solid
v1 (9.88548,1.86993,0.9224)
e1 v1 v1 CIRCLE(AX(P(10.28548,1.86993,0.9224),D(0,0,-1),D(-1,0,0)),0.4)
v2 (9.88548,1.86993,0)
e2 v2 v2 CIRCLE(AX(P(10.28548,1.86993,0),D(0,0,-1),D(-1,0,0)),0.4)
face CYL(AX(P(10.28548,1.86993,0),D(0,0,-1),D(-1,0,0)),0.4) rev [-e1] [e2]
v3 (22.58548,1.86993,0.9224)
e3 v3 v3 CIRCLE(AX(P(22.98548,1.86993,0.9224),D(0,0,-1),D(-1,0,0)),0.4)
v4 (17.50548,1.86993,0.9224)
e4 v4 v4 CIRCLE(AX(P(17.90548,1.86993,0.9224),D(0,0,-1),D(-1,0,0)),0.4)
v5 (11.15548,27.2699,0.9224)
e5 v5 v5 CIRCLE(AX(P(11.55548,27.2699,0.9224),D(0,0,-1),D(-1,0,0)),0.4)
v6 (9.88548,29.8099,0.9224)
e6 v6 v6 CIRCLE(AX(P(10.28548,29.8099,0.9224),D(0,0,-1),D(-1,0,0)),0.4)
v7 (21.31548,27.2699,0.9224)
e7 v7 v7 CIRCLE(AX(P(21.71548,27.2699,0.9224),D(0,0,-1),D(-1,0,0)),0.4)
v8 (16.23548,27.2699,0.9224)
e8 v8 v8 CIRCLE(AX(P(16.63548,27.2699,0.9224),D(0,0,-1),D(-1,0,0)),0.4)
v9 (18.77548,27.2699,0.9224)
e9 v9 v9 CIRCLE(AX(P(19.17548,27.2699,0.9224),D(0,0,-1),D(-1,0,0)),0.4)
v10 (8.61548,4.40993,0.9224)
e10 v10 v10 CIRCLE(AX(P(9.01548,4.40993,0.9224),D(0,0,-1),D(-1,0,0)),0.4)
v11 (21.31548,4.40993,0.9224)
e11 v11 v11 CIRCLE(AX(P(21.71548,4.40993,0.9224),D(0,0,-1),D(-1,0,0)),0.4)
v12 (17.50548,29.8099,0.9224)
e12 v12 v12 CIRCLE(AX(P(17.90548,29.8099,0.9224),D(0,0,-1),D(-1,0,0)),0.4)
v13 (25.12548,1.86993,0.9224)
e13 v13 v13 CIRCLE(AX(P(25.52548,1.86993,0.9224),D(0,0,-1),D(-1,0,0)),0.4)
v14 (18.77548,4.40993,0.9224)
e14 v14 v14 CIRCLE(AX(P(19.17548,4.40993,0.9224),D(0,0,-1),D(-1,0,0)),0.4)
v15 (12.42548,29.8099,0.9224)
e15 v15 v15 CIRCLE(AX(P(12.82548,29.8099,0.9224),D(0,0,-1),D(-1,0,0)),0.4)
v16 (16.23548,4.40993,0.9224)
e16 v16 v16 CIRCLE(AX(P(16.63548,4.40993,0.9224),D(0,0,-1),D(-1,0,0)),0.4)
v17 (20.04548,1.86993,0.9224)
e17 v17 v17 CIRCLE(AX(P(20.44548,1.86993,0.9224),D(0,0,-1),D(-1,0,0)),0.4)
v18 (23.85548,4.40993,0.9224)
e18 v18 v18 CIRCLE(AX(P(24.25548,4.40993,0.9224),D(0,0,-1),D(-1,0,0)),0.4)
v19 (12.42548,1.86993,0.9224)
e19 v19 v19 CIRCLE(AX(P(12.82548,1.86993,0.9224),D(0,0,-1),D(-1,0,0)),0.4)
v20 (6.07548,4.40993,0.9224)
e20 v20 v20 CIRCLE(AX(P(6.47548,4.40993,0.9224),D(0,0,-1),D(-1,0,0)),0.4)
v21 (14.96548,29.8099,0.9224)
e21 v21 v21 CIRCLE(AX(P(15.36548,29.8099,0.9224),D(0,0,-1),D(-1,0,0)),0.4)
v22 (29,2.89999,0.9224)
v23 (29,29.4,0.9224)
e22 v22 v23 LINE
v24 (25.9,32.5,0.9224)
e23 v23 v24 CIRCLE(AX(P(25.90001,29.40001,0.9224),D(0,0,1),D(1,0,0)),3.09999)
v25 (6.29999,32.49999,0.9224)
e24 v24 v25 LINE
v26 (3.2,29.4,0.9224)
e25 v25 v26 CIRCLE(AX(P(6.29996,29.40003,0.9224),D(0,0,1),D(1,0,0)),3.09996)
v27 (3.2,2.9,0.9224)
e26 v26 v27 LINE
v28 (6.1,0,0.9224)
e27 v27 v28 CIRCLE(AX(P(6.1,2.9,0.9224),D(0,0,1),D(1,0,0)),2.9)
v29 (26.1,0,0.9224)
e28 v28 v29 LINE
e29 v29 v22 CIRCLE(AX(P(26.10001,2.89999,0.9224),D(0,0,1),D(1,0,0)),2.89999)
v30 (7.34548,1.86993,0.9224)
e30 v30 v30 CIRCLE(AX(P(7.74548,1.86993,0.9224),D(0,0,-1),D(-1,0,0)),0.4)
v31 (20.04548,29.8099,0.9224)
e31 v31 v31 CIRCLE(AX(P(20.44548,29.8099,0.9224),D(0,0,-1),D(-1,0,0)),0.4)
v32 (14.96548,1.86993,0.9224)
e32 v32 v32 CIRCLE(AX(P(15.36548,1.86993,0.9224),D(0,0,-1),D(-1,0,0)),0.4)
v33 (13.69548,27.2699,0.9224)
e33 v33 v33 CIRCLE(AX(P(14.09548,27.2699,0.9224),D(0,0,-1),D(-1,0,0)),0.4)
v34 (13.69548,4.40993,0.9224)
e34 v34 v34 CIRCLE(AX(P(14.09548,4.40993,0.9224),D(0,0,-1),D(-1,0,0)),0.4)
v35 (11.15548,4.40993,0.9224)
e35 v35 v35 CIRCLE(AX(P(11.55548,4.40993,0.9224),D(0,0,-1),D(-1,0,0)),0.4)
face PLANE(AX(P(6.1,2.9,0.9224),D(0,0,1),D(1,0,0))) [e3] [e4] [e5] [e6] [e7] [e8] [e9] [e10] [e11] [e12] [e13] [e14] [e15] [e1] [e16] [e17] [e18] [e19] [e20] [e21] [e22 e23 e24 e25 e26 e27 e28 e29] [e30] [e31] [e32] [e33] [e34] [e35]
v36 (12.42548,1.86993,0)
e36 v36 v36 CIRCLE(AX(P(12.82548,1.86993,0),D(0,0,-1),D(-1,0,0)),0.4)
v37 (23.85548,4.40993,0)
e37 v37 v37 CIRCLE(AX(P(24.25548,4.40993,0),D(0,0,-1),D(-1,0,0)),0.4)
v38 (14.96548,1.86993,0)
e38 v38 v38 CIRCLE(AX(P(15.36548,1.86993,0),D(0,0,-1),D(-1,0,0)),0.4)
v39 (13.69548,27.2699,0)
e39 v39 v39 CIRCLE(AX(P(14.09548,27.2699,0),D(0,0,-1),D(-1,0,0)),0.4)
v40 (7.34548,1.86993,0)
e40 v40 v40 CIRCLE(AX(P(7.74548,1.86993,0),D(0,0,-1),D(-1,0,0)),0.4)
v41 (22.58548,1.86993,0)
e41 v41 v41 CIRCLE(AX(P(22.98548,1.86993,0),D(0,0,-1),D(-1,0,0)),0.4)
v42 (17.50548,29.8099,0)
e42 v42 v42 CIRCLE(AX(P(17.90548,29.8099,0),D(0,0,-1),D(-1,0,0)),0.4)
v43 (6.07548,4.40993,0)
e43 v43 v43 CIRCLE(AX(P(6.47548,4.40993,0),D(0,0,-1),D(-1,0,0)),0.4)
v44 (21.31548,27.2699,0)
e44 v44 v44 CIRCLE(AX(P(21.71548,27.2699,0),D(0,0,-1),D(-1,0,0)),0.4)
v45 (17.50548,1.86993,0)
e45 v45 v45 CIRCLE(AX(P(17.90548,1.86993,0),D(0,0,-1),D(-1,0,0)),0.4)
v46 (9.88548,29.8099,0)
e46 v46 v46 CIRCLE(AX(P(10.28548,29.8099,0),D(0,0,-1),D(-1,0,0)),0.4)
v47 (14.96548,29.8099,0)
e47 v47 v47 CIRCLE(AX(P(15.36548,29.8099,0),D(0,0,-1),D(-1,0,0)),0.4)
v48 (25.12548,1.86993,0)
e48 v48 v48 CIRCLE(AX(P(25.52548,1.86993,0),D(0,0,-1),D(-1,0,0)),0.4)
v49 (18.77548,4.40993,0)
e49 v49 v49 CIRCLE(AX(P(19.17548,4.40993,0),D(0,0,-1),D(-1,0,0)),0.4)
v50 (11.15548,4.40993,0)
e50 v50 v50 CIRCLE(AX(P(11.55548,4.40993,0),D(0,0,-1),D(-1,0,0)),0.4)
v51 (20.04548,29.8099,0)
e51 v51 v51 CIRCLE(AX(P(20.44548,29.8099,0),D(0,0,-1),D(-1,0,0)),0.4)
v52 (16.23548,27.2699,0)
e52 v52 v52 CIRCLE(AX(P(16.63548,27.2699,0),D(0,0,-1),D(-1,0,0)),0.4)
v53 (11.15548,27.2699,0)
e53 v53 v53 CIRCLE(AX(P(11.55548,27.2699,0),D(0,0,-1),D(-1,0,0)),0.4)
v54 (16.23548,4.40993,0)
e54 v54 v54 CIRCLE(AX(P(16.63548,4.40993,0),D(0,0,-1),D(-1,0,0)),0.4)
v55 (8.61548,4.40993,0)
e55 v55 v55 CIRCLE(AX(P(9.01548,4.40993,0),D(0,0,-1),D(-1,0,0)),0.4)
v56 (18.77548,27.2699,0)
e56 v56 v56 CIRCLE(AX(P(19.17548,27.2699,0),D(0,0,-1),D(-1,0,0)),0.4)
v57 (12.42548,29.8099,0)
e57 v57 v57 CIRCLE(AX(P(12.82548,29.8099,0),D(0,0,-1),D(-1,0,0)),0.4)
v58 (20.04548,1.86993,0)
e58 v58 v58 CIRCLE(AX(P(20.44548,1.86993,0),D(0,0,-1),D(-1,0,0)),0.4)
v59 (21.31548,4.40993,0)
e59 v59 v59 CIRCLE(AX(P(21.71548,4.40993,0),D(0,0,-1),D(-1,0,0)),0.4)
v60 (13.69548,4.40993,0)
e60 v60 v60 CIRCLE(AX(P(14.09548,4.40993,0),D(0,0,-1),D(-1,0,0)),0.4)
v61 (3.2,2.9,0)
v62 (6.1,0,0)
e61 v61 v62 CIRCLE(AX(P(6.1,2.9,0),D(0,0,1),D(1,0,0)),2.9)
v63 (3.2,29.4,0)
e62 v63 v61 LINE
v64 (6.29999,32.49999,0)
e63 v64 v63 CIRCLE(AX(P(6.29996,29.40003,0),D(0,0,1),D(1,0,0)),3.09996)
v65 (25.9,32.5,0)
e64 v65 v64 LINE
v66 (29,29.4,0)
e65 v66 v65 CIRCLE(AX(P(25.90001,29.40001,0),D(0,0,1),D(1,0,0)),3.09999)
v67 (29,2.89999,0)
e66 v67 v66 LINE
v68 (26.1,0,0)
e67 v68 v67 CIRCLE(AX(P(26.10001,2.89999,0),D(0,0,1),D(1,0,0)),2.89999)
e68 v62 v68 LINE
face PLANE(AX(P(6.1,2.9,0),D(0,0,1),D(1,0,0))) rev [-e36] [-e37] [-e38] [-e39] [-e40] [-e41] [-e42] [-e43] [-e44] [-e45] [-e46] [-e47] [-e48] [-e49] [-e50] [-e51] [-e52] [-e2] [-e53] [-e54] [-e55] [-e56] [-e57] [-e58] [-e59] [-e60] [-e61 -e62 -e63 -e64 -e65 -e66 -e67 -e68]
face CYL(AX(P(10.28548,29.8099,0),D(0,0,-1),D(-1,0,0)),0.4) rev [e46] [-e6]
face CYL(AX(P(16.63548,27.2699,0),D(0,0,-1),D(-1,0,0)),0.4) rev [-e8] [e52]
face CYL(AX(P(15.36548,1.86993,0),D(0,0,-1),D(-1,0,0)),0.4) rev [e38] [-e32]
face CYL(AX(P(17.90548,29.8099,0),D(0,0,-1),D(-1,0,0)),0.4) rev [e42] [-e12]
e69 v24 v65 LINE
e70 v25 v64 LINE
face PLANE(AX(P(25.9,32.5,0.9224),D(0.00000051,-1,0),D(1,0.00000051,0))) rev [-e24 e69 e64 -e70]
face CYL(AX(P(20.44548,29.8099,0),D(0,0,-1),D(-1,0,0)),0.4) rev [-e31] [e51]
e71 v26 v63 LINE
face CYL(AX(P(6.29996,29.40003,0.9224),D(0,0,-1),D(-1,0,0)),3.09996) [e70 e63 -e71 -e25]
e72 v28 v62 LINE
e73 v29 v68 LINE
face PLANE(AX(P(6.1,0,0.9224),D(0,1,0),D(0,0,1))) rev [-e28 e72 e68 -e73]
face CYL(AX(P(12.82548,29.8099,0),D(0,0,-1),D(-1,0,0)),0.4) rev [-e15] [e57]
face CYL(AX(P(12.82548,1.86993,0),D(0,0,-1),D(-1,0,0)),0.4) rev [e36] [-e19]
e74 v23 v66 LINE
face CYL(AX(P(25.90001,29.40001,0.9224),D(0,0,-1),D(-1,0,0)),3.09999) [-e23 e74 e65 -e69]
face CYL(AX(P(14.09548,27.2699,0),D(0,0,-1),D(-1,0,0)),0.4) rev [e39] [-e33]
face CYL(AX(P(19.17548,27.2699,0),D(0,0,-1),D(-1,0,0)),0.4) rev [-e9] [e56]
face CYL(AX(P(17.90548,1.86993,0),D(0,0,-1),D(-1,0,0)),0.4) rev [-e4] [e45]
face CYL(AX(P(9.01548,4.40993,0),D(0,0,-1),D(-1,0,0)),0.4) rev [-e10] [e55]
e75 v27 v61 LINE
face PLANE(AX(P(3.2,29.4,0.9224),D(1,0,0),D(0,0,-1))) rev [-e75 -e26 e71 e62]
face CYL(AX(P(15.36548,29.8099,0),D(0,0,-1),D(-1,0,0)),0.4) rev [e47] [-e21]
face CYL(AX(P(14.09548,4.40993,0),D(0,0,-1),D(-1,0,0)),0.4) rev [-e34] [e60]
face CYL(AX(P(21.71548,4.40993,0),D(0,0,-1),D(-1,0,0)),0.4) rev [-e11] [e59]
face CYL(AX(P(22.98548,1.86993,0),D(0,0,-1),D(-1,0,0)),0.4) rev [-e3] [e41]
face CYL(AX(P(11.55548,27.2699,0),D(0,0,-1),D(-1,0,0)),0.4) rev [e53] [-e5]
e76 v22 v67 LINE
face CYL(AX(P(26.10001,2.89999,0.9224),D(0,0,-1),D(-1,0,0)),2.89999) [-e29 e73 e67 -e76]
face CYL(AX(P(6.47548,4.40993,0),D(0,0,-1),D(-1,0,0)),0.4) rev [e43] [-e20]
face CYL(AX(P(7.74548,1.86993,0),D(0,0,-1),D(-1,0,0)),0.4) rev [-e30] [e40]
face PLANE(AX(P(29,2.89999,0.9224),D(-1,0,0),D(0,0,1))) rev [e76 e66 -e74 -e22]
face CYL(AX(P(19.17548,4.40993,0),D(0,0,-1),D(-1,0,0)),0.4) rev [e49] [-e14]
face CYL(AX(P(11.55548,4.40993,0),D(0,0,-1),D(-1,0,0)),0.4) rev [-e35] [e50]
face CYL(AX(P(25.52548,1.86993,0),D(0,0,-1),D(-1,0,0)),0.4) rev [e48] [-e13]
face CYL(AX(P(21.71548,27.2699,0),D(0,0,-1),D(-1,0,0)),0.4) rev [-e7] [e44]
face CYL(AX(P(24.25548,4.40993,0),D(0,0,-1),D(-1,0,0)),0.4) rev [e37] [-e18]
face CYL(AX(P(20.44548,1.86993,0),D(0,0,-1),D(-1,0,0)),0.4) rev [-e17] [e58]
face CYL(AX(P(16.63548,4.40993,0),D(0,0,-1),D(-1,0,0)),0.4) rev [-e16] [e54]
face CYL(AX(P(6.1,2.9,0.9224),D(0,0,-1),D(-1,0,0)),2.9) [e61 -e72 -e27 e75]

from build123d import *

# Parameters (mm, degrees)
BOARD_DEPTH                        = 0.9224
F_1_0_228_DIAMETER_HOLE1_OUTLINE_R = 0.4
F_1_0_228_DIAMETER_HOLE1_DEPTH     = 0.9224


# Read off the part's stored shape, not the designer's step: #1 (0.228) Diameter Hole1
with BuildPart() as part:
    # Sketch1 → Board (new body)
    with BuildSketch(Plane.XY):
        with BuildLine():
            Line((6.1, 0), (26.1, 0))
            ThreePointArc((26.1, 0), (28.150609059, 0.84938387), (29, 2.89999))
            Line((29, 2.89999), (29, 29.4))
            ThreePointArc((29, 29.4), (28.092033951, 31.592033951), (25.9, 32.5))
            Line((25.9, 32.5), (6.29999, 32.49999))
            ThreePointArc((6.29999, 32.49999), (4.107957262, 31.592032738), (3.2, 29.4))
            Line((3.2, 29.4), (3.2, 2.9))
            ThreePointArc((3.2, 2.9), (4.049390335, 0.849390335), (6.1, 0))
        make_face()
    extrude(amount=BOARD_DEPTH)

    # #1 (0.228) Diameter Hole1 outline → #1 (0.228) Diameter Hole1 (cut)
    with BuildSketch(Plane.XY):
        with Locations((10.28548, 1.86993)):
            Circle(F_1_0_228_DIAMETER_HOLE1_OUTLINE_R)
        with Locations((9.01548, 4.40993)):
            Circle(F_1_0_228_DIAMETER_HOLE1_OUTLINE_R)
        with Locations((6.47548, 4.40993)):
            Circle(F_1_0_228_DIAMETER_HOLE1_OUTLINE_R)
        with Locations((7.74548, 1.86993)):
            Circle(F_1_0_228_DIAMETER_HOLE1_OUTLINE_R)
        with Locations((11.55548, 4.40993)):
            Circle(F_1_0_228_DIAMETER_HOLE1_OUTLINE_R)
        with Locations((12.82548, 1.86993)):
            Circle(F_1_0_228_DIAMETER_HOLE1_OUTLINE_R)
        with Locations((14.09548, 4.40993)):
            Circle(F_1_0_228_DIAMETER_HOLE1_OUTLINE_R)
        with Locations((24.25548, 4.40993)):
            Circle(F_1_0_228_DIAMETER_HOLE1_OUTLINE_R)
        with Locations((20.44548, 1.86993)):
            Circle(F_1_0_228_DIAMETER_HOLE1_OUTLINE_R)
        with Locations((22.98548, 1.86993)):
            Circle(F_1_0_228_DIAMETER_HOLE1_OUTLINE_R)
        with Locations((16.63548, 4.40993)):
            Circle(F_1_0_228_DIAMETER_HOLE1_OUTLINE_R)
        with Locations((19.17548, 4.40993)):
            Circle(F_1_0_228_DIAMETER_HOLE1_OUTLINE_R)
        with Locations((15.36548, 1.86993)):
            Circle(F_1_0_228_DIAMETER_HOLE1_OUTLINE_R)
        with Locations((17.90548, 1.86993)):
            Circle(F_1_0_228_DIAMETER_HOLE1_OUTLINE_R)
        with Locations((21.71548, 4.40993)):
            Circle(F_1_0_228_DIAMETER_HOLE1_OUTLINE_R)
        with Locations((25.52548, 1.86993)):
            Circle(F_1_0_228_DIAMETER_HOLE1_OUTLINE_R)
        with Locations((10.28548, 29.8099)):
            Circle(F_1_0_228_DIAMETER_HOLE1_OUTLINE_R)
        with Locations((12.82548, 29.8099)):
            Circle(F_1_0_228_DIAMETER_HOLE1_OUTLINE_R)
        with Locations((11.55548, 27.2699)):
            Circle(F_1_0_228_DIAMETER_HOLE1_OUTLINE_R)
        with Locations((14.09548, 27.2699)):
            Circle(F_1_0_228_DIAMETER_HOLE1_OUTLINE_R)
        with Locations((20.44548, 29.8099)):
            Circle(F_1_0_228_DIAMETER_HOLE1_OUTLINE_R)
        with Locations((21.71548, 27.2699)):
            Circle(F_1_0_228_DIAMETER_HOLE1_OUTLINE_R)
        with Locations((19.17548, 27.2699)):
            Circle(F_1_0_228_DIAMETER_HOLE1_OUTLINE_R)
        with Locations((17.90548, 29.8099)):
            Circle(F_1_0_228_DIAMETER_HOLE1_OUTLINE_R)
        with Locations((16.63548, 27.2699)):
            Circle(F_1_0_228_DIAMETER_HOLE1_OUTLINE_R)
        with Locations((15.36548, 29.8099)):
            Circle(F_1_0_228_DIAMETER_HOLE1_OUTLINE_R)
    extrude(amount=F_1_0_228_DIAMETER_HOLE1_DEPTH, mode=Mode.SUBTRACT)


solid = part.part
